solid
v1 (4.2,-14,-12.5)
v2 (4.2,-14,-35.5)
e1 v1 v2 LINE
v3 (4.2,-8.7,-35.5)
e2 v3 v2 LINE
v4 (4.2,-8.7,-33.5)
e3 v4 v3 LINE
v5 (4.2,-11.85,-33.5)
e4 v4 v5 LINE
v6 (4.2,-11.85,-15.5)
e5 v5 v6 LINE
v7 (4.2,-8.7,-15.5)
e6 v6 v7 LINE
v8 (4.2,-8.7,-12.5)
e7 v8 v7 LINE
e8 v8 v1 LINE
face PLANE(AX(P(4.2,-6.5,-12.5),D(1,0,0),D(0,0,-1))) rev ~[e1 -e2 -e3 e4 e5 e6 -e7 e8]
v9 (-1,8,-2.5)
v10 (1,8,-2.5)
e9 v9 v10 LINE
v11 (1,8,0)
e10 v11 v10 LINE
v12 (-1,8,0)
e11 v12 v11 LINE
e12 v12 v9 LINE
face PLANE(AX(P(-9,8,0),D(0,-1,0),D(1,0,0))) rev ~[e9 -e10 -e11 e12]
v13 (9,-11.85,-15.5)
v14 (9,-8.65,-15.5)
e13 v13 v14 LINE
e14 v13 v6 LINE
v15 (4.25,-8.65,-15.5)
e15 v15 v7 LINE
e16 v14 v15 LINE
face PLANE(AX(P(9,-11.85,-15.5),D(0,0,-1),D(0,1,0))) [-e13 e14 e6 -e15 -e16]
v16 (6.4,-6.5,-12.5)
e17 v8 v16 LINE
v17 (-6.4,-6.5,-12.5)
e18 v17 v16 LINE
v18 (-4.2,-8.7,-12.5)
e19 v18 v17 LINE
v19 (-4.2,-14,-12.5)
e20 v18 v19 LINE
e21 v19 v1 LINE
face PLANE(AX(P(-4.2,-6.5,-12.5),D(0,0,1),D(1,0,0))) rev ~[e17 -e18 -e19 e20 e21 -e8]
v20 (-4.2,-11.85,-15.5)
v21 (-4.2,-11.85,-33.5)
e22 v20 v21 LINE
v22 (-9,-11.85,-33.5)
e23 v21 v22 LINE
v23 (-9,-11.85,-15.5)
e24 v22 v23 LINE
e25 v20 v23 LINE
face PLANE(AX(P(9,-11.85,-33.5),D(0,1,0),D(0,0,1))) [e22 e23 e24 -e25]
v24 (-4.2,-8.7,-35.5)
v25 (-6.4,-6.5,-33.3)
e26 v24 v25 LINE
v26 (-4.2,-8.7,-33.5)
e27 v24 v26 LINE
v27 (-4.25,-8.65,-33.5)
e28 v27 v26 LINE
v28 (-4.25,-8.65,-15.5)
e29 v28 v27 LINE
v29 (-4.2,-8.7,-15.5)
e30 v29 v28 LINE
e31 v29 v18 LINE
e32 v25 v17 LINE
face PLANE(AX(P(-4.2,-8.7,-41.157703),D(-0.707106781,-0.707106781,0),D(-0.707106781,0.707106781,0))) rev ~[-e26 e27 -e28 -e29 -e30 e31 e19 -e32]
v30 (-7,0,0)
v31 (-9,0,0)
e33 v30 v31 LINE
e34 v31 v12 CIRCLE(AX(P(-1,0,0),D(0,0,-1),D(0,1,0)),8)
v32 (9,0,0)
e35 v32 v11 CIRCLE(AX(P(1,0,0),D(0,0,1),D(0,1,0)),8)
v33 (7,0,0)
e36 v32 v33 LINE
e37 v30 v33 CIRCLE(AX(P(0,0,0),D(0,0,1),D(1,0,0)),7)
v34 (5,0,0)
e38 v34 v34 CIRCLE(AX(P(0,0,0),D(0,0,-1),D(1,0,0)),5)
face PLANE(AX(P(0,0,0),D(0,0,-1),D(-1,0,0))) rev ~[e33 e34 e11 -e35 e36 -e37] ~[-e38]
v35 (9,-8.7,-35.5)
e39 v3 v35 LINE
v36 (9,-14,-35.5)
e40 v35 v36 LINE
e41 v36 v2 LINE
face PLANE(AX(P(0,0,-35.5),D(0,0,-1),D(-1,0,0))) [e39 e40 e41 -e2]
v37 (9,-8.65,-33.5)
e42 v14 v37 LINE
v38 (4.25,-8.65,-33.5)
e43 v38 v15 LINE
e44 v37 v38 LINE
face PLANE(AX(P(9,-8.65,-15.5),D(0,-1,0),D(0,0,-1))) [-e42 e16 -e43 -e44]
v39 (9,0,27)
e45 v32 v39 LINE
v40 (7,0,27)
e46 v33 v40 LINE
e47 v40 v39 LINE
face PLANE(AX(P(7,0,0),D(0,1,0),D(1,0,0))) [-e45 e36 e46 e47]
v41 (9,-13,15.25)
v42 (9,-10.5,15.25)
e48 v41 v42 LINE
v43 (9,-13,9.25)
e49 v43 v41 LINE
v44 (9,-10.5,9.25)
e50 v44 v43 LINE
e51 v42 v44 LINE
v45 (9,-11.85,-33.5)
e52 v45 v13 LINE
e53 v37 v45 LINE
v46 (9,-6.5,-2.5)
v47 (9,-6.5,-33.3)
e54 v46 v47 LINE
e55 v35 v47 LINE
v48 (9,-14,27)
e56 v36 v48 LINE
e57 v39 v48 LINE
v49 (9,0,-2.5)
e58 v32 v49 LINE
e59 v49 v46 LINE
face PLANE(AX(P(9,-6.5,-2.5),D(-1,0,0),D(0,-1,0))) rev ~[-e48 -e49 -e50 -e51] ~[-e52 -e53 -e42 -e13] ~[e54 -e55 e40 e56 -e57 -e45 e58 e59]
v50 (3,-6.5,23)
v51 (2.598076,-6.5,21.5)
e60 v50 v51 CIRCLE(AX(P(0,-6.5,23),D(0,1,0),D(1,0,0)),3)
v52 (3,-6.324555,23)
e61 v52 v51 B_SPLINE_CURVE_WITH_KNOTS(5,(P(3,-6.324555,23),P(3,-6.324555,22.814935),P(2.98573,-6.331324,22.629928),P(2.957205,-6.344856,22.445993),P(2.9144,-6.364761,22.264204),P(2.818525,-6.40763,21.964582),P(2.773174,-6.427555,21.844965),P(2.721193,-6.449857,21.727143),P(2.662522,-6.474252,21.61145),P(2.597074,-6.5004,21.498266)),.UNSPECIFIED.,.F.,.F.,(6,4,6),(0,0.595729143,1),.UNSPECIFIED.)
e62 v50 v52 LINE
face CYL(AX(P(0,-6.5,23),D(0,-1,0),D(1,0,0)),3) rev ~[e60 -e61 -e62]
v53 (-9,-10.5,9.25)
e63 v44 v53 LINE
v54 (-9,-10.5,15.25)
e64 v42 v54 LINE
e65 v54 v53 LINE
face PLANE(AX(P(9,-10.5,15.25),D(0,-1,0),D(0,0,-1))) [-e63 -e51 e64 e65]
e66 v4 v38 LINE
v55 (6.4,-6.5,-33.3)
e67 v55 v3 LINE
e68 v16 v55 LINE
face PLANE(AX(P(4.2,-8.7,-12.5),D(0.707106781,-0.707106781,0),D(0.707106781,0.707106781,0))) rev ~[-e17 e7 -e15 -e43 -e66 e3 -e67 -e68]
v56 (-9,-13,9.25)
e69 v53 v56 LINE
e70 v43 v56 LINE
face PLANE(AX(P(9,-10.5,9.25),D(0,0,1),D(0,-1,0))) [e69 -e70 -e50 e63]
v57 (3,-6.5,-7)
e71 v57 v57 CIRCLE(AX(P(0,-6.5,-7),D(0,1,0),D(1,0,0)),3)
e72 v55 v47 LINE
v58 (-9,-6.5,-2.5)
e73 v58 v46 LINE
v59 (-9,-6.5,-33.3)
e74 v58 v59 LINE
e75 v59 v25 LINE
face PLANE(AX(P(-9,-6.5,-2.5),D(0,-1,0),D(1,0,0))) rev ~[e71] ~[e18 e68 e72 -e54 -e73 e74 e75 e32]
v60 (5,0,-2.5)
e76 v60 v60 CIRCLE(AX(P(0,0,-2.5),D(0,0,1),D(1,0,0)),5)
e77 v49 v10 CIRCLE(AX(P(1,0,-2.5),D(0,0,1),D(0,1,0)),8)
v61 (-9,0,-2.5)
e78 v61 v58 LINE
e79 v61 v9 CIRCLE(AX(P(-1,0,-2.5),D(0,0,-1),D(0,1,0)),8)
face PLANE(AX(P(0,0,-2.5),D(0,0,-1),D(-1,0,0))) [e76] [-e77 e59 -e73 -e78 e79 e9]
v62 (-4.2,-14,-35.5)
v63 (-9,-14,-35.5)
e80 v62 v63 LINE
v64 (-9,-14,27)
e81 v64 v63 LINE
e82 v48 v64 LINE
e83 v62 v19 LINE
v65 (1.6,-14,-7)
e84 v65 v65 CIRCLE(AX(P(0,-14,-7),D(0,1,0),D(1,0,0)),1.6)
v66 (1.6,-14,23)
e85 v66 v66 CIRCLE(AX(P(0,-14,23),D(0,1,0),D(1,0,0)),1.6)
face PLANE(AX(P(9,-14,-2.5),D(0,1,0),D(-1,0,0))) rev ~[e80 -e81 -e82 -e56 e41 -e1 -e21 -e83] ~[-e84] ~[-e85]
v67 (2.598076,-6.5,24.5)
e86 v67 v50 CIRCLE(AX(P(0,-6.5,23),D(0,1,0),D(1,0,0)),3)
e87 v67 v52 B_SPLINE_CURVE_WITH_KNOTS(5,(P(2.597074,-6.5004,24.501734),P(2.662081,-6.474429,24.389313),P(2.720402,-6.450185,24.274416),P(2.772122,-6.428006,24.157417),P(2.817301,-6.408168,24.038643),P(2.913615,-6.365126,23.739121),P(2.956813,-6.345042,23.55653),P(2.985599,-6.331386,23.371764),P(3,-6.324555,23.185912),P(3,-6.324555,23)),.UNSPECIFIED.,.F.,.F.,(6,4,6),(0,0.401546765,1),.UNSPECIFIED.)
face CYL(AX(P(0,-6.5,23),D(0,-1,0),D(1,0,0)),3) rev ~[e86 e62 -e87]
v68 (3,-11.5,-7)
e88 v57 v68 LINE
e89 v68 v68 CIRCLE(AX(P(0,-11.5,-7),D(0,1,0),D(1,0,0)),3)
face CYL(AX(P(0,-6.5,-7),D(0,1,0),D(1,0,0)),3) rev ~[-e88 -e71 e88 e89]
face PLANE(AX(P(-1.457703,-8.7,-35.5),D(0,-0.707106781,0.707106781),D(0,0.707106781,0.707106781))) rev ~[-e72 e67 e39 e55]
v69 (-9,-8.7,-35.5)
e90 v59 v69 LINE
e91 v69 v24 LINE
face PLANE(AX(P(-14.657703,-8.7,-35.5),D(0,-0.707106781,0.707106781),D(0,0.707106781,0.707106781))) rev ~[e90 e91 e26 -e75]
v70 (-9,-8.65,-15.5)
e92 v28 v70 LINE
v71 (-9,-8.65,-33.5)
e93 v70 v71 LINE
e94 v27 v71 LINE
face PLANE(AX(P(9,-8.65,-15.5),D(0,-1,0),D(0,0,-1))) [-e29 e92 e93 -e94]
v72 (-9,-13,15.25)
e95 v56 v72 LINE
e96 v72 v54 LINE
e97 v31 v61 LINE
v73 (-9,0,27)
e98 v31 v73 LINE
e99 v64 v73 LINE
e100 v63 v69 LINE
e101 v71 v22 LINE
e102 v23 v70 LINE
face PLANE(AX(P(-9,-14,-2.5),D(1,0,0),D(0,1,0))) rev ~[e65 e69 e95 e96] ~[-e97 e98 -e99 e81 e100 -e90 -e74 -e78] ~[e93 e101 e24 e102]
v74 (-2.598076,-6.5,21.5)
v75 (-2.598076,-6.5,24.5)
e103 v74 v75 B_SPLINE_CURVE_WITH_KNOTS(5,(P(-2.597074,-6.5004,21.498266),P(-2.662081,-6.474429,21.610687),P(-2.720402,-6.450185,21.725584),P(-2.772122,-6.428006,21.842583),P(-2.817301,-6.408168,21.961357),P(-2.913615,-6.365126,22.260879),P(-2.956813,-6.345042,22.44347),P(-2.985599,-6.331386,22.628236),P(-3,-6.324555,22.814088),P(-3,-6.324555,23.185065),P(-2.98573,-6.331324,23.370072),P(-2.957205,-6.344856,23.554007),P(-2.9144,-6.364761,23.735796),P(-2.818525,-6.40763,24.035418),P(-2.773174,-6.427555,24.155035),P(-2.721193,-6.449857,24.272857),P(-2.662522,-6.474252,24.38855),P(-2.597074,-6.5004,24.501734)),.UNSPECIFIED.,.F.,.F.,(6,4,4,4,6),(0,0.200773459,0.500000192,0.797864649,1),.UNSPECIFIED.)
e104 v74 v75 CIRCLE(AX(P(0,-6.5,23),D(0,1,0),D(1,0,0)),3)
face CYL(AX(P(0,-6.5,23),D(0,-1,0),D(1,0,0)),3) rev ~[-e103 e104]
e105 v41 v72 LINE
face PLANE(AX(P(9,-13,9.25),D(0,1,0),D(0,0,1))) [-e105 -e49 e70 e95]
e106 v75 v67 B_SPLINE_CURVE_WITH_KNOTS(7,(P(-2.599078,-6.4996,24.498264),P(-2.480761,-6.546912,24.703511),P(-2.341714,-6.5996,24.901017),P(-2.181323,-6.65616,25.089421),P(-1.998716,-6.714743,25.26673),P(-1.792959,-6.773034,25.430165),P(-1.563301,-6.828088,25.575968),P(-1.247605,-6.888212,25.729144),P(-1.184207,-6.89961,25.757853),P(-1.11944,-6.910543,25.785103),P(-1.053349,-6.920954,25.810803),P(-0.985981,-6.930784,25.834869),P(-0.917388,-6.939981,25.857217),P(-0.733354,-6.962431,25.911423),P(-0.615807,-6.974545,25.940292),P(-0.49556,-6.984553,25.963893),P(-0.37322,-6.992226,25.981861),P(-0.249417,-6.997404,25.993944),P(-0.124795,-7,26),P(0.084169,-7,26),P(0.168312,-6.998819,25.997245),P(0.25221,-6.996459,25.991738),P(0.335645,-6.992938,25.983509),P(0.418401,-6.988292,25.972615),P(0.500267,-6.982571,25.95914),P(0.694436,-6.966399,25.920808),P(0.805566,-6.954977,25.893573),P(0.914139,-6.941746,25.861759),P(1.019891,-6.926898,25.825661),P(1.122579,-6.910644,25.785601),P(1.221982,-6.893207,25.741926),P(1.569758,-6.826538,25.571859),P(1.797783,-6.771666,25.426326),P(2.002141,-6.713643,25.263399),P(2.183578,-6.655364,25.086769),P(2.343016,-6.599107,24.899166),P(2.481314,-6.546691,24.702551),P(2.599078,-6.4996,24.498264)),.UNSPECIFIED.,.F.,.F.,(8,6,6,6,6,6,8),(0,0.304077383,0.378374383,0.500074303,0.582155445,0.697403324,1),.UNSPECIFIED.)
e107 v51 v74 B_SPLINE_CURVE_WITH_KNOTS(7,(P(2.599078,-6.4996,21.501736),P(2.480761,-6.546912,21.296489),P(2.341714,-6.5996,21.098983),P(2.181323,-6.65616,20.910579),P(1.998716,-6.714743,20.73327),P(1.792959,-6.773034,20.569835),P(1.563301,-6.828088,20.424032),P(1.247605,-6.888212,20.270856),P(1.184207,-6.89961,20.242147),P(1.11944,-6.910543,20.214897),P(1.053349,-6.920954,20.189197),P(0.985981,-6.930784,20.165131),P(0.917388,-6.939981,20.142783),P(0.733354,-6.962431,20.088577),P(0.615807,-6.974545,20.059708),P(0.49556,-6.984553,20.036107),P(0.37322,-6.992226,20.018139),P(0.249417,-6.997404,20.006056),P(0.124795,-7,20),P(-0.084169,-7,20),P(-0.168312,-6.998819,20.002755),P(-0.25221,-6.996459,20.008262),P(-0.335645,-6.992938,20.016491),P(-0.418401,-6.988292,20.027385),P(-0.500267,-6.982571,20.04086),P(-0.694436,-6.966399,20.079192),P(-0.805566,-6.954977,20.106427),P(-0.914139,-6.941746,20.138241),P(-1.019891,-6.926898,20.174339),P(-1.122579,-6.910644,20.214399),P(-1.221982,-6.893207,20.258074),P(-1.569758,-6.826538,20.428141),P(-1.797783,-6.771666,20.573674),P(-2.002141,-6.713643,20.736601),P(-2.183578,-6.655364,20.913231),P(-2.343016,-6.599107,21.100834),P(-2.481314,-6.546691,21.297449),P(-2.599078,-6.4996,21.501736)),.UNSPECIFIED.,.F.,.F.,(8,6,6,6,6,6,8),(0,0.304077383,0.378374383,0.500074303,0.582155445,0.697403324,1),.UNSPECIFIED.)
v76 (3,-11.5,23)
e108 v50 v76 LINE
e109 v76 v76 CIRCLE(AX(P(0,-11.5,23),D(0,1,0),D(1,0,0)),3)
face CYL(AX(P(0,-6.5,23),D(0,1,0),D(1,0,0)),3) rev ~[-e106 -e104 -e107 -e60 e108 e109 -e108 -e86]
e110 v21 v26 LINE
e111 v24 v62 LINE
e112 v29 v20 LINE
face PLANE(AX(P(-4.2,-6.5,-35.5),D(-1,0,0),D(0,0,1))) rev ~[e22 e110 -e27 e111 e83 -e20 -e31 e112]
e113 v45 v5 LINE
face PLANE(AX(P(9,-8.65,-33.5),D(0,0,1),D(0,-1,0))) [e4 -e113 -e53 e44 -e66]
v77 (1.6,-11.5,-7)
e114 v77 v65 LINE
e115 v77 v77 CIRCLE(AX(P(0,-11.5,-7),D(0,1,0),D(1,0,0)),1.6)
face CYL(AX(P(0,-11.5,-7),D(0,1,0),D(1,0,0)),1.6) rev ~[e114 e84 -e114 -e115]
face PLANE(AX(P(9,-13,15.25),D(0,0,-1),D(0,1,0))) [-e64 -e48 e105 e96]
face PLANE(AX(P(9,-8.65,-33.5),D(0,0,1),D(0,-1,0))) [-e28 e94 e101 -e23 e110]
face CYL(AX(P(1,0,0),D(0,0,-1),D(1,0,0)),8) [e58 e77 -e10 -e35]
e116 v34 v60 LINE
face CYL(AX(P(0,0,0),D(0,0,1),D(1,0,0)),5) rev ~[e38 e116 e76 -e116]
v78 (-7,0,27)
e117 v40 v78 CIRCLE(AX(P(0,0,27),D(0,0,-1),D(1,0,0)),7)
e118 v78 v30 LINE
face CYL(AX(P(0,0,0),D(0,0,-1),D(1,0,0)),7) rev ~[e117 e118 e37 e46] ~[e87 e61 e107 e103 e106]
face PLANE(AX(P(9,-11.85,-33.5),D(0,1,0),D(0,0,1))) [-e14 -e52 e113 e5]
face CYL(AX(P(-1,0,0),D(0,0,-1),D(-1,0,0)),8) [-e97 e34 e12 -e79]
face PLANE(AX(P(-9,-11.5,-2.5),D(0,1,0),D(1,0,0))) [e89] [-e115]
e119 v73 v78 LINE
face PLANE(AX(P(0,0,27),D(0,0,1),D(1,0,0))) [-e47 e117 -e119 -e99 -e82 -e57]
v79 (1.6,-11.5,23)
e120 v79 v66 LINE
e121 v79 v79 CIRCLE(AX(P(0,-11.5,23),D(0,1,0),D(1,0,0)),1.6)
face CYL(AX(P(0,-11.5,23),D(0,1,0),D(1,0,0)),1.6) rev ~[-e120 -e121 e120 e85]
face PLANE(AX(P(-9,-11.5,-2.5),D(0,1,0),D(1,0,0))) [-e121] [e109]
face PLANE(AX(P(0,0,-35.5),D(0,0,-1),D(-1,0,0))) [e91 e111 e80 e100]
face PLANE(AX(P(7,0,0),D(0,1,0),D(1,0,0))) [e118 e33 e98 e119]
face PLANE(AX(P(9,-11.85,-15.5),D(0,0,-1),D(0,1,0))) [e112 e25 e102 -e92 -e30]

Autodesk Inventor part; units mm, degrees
ref_plane "YZ Plane" through (0, 0, 0) normal (1, 0, 0) x (0, 1, 0)
ref_plane "XZ Plane" through (0, 0, 0) normal (0, 1, 0) x (-1, 0, 0)
ref_plane "XY Plane" through (0, 0, 0) normal (0, 0, 1) x (1, 0, 0)
sketch "Sketch1" plane through (0, 0, 0) normal (0, 0, 1) x (1, 0, 0)
  circle A0 centre (0, 0) radius 7
  circle A1 centre (0, 0) radius 5
  circle A2 centre (0, 0) radius 1
  line L0 (-9, 0) -> (9, 0)
  line L1 (9, 0) -> (9, -14)
  line L2 (9, -14) -> (-9, -14)
  line L3 (-9, -14) -> (-9, 0)
  dimension "d11" = 14
  dimension "d12" = 10
  dimension "d13" = 2
  dimension "d18" = 14
  dimension "d19" = 18
extrude "Extrusion1" add sketch "Sketch1" along normal blind 27 contours L0 L1 L2 L3 A0 | A0 L0 A1 | A1 L0 A2 | A2 L0 picked at (6.2655, -0.5584) picked at (3.6182, -0.3989) picked at (-0.2952, -0.1549)
sketch "Sketch3" plane through (0, 0, 0) normal (0, 0, -1) x (-1, 0, 0)
  line L0 (9, -14) -> (9, 0) projected
  line L1 (-9, -14) -> (9, -14)
  line L2 (9, -14) -> (9, 8)
  line L3 (9, 8) -> (-9, 8)
  line L4 (-9, 8) -> (-9, -14)
  dimension "d22" = 22
extrude "Extrusion6" add sketch "Sketch3" along normal blind 2.5
extrude "Extrusion5" cut sketch "Sketch1" along normal blind 30 contours L0 A1 A0 | A0 L0 A1 | L0 A2 A1 | A1 L0 A2 | L0 A2 | A2 L0
extrude "Extrusion7" cut sketch "Sketch1" against normal through all contours L0 A2 A1 | A1 L0 A2 | L0 A2 | A2 L0
fillet "Fillet1" radius 8 2 edges at (-9, 8, -1.25) (9, 8, -1.25)
sketch "Sketch4" plane through (9, -14, 27) normal (1, 0, 0) x (0, 0, -1)
  line L0 (0, 0) -> (29.5, 0) projected
  line L1 (11.75, 3.5) -> (17.75, 3.5)
  line L2 (17.75, 3.5) -> (17.75, 1)
  line L3 (17.75, 1) -> (11.75, 1)
  line L4 (11.75, 1) -> (11.75, 3.5)
  point P0 (14.75, 0)
  point P1 (14.75, 1)
  dimension "d32" = 6
  dimension "d33" = 2.5
  dimension "d34" = 1
extrude "Extrusion8" cut sketch "Sketch4" against normal through all
sketch "Sketch5" plane through (0, 0, -2.5) normal (0, 0, -1) x (-1, 0, 0)
  line L0 (9, -14) -> (9, 0) projected
  line L1 (-9, -14) -> (9, -14)
  line L2 (9, -14) -> (9, -6.5)
  line L3 (9, -6.5) -> (-9, -6.5)
  line L4 (-9, -6.5) -> (-9, -14)
  dimension "d37" = 7.5
extrude "Extrusion9" add sketch "Sketch5" along normal blind 33
sketch "Sketch6" plane through (-9, -6.5, -2.5) normal (0, 1, 0) x (1, 0, 0)
  line L0 (4.8, 10) -> (13.2, 10)
  line L1 (13.2, 10) -> (13.2, 33)
  line L2 (13.2, 33) -> (4.8, 33)
  line L3 (4.8, 33) -> (4.8, 10)
  line L4 (0, 33) -> (18, 33) projected
  point P0 (9, -2.5)
  point P1 (9, 33)
  point P2 (9, 33)
  dimension "d45" = 23
  dimension "d47" = 0
  dimension "d69" = 8.4
extrude "Extrusion10" cut sketch "Sketch6" against normal blind 30
sketch "Sketch7" plane through (9, -14, 27) normal (1, 0, 0) x (0, 0, -1)
  line L0 (42.5, 5.35) -> (60.5, 5.35)
  line L1 (60.5, 5.35) -> (60.5, 2.15)
  line L2 (60.5, 2.15) -> (42.5, 2.15)
  line L3 (42.5, 2.15) -> (42.5, 5.35)
  line L4 (62.5, 7.5) -> (62.5, 0) projected
  line L5 (62.5, 7.5) -> (39.5, 7.5) projected
  point P0 (27, 14)
  point P1 (60.5, 3.75)
  point P2 (62.5, 3.75)
  point P3 (51.5, 5.35)
  point P4 (51, 7.5)
  point P5 (59.5, 7.5)
  dimension "d49" = 3.2
  dimension "d55" = 18
  dimension "d70" = 20
extrude "Extrusion11" cut sketch "Sketch7" against normal through all
sketch "Sketch8" plane through (-9, -6.5, -2.5) normal (0, 1, 0) x (1, 0, 0)
  circle A0 centre (9, 4.5) radius 3
  circle A1 centre (9, -25.5) radius 3
  line L0 (16, -29.5) -> (2, -29.5) projected
  point P0 (9, -2.5)
  dimension "d56" = 6
  dimension "d57" = 6
  dimension "d58" = 4
  dimension "d59" = 34
extrude "Extrusion12" cut sketch "Sketch8" along normal mid plane 10
sketch "Sketch9" plane through (0, -11.5, -7) normal (0, 1, 0) x (1, 0, 0)
  circle A0 centre (0, 0) radius 3 projected
  circle A1 centre (0, 0) radius 1.6
  circle A2 centre (0, -30) radius 1.6
  point P0 (0, -7)
  dimension "d62" = 3.2
  dimension "d63" = 3.2
extrude "Extrusion13" cut sketch "Sketch9" against normal through all contours A1 | A2
chamfer "Chamfer2" distance 2.2 angle 45 4 edges at (4.2, -6.5, -24) (-4.2, -6.5, -24) (6.6, -6.5, -35.5) (-6.6, -6.5, -35.5)
properties part number "Solinoid holder"
